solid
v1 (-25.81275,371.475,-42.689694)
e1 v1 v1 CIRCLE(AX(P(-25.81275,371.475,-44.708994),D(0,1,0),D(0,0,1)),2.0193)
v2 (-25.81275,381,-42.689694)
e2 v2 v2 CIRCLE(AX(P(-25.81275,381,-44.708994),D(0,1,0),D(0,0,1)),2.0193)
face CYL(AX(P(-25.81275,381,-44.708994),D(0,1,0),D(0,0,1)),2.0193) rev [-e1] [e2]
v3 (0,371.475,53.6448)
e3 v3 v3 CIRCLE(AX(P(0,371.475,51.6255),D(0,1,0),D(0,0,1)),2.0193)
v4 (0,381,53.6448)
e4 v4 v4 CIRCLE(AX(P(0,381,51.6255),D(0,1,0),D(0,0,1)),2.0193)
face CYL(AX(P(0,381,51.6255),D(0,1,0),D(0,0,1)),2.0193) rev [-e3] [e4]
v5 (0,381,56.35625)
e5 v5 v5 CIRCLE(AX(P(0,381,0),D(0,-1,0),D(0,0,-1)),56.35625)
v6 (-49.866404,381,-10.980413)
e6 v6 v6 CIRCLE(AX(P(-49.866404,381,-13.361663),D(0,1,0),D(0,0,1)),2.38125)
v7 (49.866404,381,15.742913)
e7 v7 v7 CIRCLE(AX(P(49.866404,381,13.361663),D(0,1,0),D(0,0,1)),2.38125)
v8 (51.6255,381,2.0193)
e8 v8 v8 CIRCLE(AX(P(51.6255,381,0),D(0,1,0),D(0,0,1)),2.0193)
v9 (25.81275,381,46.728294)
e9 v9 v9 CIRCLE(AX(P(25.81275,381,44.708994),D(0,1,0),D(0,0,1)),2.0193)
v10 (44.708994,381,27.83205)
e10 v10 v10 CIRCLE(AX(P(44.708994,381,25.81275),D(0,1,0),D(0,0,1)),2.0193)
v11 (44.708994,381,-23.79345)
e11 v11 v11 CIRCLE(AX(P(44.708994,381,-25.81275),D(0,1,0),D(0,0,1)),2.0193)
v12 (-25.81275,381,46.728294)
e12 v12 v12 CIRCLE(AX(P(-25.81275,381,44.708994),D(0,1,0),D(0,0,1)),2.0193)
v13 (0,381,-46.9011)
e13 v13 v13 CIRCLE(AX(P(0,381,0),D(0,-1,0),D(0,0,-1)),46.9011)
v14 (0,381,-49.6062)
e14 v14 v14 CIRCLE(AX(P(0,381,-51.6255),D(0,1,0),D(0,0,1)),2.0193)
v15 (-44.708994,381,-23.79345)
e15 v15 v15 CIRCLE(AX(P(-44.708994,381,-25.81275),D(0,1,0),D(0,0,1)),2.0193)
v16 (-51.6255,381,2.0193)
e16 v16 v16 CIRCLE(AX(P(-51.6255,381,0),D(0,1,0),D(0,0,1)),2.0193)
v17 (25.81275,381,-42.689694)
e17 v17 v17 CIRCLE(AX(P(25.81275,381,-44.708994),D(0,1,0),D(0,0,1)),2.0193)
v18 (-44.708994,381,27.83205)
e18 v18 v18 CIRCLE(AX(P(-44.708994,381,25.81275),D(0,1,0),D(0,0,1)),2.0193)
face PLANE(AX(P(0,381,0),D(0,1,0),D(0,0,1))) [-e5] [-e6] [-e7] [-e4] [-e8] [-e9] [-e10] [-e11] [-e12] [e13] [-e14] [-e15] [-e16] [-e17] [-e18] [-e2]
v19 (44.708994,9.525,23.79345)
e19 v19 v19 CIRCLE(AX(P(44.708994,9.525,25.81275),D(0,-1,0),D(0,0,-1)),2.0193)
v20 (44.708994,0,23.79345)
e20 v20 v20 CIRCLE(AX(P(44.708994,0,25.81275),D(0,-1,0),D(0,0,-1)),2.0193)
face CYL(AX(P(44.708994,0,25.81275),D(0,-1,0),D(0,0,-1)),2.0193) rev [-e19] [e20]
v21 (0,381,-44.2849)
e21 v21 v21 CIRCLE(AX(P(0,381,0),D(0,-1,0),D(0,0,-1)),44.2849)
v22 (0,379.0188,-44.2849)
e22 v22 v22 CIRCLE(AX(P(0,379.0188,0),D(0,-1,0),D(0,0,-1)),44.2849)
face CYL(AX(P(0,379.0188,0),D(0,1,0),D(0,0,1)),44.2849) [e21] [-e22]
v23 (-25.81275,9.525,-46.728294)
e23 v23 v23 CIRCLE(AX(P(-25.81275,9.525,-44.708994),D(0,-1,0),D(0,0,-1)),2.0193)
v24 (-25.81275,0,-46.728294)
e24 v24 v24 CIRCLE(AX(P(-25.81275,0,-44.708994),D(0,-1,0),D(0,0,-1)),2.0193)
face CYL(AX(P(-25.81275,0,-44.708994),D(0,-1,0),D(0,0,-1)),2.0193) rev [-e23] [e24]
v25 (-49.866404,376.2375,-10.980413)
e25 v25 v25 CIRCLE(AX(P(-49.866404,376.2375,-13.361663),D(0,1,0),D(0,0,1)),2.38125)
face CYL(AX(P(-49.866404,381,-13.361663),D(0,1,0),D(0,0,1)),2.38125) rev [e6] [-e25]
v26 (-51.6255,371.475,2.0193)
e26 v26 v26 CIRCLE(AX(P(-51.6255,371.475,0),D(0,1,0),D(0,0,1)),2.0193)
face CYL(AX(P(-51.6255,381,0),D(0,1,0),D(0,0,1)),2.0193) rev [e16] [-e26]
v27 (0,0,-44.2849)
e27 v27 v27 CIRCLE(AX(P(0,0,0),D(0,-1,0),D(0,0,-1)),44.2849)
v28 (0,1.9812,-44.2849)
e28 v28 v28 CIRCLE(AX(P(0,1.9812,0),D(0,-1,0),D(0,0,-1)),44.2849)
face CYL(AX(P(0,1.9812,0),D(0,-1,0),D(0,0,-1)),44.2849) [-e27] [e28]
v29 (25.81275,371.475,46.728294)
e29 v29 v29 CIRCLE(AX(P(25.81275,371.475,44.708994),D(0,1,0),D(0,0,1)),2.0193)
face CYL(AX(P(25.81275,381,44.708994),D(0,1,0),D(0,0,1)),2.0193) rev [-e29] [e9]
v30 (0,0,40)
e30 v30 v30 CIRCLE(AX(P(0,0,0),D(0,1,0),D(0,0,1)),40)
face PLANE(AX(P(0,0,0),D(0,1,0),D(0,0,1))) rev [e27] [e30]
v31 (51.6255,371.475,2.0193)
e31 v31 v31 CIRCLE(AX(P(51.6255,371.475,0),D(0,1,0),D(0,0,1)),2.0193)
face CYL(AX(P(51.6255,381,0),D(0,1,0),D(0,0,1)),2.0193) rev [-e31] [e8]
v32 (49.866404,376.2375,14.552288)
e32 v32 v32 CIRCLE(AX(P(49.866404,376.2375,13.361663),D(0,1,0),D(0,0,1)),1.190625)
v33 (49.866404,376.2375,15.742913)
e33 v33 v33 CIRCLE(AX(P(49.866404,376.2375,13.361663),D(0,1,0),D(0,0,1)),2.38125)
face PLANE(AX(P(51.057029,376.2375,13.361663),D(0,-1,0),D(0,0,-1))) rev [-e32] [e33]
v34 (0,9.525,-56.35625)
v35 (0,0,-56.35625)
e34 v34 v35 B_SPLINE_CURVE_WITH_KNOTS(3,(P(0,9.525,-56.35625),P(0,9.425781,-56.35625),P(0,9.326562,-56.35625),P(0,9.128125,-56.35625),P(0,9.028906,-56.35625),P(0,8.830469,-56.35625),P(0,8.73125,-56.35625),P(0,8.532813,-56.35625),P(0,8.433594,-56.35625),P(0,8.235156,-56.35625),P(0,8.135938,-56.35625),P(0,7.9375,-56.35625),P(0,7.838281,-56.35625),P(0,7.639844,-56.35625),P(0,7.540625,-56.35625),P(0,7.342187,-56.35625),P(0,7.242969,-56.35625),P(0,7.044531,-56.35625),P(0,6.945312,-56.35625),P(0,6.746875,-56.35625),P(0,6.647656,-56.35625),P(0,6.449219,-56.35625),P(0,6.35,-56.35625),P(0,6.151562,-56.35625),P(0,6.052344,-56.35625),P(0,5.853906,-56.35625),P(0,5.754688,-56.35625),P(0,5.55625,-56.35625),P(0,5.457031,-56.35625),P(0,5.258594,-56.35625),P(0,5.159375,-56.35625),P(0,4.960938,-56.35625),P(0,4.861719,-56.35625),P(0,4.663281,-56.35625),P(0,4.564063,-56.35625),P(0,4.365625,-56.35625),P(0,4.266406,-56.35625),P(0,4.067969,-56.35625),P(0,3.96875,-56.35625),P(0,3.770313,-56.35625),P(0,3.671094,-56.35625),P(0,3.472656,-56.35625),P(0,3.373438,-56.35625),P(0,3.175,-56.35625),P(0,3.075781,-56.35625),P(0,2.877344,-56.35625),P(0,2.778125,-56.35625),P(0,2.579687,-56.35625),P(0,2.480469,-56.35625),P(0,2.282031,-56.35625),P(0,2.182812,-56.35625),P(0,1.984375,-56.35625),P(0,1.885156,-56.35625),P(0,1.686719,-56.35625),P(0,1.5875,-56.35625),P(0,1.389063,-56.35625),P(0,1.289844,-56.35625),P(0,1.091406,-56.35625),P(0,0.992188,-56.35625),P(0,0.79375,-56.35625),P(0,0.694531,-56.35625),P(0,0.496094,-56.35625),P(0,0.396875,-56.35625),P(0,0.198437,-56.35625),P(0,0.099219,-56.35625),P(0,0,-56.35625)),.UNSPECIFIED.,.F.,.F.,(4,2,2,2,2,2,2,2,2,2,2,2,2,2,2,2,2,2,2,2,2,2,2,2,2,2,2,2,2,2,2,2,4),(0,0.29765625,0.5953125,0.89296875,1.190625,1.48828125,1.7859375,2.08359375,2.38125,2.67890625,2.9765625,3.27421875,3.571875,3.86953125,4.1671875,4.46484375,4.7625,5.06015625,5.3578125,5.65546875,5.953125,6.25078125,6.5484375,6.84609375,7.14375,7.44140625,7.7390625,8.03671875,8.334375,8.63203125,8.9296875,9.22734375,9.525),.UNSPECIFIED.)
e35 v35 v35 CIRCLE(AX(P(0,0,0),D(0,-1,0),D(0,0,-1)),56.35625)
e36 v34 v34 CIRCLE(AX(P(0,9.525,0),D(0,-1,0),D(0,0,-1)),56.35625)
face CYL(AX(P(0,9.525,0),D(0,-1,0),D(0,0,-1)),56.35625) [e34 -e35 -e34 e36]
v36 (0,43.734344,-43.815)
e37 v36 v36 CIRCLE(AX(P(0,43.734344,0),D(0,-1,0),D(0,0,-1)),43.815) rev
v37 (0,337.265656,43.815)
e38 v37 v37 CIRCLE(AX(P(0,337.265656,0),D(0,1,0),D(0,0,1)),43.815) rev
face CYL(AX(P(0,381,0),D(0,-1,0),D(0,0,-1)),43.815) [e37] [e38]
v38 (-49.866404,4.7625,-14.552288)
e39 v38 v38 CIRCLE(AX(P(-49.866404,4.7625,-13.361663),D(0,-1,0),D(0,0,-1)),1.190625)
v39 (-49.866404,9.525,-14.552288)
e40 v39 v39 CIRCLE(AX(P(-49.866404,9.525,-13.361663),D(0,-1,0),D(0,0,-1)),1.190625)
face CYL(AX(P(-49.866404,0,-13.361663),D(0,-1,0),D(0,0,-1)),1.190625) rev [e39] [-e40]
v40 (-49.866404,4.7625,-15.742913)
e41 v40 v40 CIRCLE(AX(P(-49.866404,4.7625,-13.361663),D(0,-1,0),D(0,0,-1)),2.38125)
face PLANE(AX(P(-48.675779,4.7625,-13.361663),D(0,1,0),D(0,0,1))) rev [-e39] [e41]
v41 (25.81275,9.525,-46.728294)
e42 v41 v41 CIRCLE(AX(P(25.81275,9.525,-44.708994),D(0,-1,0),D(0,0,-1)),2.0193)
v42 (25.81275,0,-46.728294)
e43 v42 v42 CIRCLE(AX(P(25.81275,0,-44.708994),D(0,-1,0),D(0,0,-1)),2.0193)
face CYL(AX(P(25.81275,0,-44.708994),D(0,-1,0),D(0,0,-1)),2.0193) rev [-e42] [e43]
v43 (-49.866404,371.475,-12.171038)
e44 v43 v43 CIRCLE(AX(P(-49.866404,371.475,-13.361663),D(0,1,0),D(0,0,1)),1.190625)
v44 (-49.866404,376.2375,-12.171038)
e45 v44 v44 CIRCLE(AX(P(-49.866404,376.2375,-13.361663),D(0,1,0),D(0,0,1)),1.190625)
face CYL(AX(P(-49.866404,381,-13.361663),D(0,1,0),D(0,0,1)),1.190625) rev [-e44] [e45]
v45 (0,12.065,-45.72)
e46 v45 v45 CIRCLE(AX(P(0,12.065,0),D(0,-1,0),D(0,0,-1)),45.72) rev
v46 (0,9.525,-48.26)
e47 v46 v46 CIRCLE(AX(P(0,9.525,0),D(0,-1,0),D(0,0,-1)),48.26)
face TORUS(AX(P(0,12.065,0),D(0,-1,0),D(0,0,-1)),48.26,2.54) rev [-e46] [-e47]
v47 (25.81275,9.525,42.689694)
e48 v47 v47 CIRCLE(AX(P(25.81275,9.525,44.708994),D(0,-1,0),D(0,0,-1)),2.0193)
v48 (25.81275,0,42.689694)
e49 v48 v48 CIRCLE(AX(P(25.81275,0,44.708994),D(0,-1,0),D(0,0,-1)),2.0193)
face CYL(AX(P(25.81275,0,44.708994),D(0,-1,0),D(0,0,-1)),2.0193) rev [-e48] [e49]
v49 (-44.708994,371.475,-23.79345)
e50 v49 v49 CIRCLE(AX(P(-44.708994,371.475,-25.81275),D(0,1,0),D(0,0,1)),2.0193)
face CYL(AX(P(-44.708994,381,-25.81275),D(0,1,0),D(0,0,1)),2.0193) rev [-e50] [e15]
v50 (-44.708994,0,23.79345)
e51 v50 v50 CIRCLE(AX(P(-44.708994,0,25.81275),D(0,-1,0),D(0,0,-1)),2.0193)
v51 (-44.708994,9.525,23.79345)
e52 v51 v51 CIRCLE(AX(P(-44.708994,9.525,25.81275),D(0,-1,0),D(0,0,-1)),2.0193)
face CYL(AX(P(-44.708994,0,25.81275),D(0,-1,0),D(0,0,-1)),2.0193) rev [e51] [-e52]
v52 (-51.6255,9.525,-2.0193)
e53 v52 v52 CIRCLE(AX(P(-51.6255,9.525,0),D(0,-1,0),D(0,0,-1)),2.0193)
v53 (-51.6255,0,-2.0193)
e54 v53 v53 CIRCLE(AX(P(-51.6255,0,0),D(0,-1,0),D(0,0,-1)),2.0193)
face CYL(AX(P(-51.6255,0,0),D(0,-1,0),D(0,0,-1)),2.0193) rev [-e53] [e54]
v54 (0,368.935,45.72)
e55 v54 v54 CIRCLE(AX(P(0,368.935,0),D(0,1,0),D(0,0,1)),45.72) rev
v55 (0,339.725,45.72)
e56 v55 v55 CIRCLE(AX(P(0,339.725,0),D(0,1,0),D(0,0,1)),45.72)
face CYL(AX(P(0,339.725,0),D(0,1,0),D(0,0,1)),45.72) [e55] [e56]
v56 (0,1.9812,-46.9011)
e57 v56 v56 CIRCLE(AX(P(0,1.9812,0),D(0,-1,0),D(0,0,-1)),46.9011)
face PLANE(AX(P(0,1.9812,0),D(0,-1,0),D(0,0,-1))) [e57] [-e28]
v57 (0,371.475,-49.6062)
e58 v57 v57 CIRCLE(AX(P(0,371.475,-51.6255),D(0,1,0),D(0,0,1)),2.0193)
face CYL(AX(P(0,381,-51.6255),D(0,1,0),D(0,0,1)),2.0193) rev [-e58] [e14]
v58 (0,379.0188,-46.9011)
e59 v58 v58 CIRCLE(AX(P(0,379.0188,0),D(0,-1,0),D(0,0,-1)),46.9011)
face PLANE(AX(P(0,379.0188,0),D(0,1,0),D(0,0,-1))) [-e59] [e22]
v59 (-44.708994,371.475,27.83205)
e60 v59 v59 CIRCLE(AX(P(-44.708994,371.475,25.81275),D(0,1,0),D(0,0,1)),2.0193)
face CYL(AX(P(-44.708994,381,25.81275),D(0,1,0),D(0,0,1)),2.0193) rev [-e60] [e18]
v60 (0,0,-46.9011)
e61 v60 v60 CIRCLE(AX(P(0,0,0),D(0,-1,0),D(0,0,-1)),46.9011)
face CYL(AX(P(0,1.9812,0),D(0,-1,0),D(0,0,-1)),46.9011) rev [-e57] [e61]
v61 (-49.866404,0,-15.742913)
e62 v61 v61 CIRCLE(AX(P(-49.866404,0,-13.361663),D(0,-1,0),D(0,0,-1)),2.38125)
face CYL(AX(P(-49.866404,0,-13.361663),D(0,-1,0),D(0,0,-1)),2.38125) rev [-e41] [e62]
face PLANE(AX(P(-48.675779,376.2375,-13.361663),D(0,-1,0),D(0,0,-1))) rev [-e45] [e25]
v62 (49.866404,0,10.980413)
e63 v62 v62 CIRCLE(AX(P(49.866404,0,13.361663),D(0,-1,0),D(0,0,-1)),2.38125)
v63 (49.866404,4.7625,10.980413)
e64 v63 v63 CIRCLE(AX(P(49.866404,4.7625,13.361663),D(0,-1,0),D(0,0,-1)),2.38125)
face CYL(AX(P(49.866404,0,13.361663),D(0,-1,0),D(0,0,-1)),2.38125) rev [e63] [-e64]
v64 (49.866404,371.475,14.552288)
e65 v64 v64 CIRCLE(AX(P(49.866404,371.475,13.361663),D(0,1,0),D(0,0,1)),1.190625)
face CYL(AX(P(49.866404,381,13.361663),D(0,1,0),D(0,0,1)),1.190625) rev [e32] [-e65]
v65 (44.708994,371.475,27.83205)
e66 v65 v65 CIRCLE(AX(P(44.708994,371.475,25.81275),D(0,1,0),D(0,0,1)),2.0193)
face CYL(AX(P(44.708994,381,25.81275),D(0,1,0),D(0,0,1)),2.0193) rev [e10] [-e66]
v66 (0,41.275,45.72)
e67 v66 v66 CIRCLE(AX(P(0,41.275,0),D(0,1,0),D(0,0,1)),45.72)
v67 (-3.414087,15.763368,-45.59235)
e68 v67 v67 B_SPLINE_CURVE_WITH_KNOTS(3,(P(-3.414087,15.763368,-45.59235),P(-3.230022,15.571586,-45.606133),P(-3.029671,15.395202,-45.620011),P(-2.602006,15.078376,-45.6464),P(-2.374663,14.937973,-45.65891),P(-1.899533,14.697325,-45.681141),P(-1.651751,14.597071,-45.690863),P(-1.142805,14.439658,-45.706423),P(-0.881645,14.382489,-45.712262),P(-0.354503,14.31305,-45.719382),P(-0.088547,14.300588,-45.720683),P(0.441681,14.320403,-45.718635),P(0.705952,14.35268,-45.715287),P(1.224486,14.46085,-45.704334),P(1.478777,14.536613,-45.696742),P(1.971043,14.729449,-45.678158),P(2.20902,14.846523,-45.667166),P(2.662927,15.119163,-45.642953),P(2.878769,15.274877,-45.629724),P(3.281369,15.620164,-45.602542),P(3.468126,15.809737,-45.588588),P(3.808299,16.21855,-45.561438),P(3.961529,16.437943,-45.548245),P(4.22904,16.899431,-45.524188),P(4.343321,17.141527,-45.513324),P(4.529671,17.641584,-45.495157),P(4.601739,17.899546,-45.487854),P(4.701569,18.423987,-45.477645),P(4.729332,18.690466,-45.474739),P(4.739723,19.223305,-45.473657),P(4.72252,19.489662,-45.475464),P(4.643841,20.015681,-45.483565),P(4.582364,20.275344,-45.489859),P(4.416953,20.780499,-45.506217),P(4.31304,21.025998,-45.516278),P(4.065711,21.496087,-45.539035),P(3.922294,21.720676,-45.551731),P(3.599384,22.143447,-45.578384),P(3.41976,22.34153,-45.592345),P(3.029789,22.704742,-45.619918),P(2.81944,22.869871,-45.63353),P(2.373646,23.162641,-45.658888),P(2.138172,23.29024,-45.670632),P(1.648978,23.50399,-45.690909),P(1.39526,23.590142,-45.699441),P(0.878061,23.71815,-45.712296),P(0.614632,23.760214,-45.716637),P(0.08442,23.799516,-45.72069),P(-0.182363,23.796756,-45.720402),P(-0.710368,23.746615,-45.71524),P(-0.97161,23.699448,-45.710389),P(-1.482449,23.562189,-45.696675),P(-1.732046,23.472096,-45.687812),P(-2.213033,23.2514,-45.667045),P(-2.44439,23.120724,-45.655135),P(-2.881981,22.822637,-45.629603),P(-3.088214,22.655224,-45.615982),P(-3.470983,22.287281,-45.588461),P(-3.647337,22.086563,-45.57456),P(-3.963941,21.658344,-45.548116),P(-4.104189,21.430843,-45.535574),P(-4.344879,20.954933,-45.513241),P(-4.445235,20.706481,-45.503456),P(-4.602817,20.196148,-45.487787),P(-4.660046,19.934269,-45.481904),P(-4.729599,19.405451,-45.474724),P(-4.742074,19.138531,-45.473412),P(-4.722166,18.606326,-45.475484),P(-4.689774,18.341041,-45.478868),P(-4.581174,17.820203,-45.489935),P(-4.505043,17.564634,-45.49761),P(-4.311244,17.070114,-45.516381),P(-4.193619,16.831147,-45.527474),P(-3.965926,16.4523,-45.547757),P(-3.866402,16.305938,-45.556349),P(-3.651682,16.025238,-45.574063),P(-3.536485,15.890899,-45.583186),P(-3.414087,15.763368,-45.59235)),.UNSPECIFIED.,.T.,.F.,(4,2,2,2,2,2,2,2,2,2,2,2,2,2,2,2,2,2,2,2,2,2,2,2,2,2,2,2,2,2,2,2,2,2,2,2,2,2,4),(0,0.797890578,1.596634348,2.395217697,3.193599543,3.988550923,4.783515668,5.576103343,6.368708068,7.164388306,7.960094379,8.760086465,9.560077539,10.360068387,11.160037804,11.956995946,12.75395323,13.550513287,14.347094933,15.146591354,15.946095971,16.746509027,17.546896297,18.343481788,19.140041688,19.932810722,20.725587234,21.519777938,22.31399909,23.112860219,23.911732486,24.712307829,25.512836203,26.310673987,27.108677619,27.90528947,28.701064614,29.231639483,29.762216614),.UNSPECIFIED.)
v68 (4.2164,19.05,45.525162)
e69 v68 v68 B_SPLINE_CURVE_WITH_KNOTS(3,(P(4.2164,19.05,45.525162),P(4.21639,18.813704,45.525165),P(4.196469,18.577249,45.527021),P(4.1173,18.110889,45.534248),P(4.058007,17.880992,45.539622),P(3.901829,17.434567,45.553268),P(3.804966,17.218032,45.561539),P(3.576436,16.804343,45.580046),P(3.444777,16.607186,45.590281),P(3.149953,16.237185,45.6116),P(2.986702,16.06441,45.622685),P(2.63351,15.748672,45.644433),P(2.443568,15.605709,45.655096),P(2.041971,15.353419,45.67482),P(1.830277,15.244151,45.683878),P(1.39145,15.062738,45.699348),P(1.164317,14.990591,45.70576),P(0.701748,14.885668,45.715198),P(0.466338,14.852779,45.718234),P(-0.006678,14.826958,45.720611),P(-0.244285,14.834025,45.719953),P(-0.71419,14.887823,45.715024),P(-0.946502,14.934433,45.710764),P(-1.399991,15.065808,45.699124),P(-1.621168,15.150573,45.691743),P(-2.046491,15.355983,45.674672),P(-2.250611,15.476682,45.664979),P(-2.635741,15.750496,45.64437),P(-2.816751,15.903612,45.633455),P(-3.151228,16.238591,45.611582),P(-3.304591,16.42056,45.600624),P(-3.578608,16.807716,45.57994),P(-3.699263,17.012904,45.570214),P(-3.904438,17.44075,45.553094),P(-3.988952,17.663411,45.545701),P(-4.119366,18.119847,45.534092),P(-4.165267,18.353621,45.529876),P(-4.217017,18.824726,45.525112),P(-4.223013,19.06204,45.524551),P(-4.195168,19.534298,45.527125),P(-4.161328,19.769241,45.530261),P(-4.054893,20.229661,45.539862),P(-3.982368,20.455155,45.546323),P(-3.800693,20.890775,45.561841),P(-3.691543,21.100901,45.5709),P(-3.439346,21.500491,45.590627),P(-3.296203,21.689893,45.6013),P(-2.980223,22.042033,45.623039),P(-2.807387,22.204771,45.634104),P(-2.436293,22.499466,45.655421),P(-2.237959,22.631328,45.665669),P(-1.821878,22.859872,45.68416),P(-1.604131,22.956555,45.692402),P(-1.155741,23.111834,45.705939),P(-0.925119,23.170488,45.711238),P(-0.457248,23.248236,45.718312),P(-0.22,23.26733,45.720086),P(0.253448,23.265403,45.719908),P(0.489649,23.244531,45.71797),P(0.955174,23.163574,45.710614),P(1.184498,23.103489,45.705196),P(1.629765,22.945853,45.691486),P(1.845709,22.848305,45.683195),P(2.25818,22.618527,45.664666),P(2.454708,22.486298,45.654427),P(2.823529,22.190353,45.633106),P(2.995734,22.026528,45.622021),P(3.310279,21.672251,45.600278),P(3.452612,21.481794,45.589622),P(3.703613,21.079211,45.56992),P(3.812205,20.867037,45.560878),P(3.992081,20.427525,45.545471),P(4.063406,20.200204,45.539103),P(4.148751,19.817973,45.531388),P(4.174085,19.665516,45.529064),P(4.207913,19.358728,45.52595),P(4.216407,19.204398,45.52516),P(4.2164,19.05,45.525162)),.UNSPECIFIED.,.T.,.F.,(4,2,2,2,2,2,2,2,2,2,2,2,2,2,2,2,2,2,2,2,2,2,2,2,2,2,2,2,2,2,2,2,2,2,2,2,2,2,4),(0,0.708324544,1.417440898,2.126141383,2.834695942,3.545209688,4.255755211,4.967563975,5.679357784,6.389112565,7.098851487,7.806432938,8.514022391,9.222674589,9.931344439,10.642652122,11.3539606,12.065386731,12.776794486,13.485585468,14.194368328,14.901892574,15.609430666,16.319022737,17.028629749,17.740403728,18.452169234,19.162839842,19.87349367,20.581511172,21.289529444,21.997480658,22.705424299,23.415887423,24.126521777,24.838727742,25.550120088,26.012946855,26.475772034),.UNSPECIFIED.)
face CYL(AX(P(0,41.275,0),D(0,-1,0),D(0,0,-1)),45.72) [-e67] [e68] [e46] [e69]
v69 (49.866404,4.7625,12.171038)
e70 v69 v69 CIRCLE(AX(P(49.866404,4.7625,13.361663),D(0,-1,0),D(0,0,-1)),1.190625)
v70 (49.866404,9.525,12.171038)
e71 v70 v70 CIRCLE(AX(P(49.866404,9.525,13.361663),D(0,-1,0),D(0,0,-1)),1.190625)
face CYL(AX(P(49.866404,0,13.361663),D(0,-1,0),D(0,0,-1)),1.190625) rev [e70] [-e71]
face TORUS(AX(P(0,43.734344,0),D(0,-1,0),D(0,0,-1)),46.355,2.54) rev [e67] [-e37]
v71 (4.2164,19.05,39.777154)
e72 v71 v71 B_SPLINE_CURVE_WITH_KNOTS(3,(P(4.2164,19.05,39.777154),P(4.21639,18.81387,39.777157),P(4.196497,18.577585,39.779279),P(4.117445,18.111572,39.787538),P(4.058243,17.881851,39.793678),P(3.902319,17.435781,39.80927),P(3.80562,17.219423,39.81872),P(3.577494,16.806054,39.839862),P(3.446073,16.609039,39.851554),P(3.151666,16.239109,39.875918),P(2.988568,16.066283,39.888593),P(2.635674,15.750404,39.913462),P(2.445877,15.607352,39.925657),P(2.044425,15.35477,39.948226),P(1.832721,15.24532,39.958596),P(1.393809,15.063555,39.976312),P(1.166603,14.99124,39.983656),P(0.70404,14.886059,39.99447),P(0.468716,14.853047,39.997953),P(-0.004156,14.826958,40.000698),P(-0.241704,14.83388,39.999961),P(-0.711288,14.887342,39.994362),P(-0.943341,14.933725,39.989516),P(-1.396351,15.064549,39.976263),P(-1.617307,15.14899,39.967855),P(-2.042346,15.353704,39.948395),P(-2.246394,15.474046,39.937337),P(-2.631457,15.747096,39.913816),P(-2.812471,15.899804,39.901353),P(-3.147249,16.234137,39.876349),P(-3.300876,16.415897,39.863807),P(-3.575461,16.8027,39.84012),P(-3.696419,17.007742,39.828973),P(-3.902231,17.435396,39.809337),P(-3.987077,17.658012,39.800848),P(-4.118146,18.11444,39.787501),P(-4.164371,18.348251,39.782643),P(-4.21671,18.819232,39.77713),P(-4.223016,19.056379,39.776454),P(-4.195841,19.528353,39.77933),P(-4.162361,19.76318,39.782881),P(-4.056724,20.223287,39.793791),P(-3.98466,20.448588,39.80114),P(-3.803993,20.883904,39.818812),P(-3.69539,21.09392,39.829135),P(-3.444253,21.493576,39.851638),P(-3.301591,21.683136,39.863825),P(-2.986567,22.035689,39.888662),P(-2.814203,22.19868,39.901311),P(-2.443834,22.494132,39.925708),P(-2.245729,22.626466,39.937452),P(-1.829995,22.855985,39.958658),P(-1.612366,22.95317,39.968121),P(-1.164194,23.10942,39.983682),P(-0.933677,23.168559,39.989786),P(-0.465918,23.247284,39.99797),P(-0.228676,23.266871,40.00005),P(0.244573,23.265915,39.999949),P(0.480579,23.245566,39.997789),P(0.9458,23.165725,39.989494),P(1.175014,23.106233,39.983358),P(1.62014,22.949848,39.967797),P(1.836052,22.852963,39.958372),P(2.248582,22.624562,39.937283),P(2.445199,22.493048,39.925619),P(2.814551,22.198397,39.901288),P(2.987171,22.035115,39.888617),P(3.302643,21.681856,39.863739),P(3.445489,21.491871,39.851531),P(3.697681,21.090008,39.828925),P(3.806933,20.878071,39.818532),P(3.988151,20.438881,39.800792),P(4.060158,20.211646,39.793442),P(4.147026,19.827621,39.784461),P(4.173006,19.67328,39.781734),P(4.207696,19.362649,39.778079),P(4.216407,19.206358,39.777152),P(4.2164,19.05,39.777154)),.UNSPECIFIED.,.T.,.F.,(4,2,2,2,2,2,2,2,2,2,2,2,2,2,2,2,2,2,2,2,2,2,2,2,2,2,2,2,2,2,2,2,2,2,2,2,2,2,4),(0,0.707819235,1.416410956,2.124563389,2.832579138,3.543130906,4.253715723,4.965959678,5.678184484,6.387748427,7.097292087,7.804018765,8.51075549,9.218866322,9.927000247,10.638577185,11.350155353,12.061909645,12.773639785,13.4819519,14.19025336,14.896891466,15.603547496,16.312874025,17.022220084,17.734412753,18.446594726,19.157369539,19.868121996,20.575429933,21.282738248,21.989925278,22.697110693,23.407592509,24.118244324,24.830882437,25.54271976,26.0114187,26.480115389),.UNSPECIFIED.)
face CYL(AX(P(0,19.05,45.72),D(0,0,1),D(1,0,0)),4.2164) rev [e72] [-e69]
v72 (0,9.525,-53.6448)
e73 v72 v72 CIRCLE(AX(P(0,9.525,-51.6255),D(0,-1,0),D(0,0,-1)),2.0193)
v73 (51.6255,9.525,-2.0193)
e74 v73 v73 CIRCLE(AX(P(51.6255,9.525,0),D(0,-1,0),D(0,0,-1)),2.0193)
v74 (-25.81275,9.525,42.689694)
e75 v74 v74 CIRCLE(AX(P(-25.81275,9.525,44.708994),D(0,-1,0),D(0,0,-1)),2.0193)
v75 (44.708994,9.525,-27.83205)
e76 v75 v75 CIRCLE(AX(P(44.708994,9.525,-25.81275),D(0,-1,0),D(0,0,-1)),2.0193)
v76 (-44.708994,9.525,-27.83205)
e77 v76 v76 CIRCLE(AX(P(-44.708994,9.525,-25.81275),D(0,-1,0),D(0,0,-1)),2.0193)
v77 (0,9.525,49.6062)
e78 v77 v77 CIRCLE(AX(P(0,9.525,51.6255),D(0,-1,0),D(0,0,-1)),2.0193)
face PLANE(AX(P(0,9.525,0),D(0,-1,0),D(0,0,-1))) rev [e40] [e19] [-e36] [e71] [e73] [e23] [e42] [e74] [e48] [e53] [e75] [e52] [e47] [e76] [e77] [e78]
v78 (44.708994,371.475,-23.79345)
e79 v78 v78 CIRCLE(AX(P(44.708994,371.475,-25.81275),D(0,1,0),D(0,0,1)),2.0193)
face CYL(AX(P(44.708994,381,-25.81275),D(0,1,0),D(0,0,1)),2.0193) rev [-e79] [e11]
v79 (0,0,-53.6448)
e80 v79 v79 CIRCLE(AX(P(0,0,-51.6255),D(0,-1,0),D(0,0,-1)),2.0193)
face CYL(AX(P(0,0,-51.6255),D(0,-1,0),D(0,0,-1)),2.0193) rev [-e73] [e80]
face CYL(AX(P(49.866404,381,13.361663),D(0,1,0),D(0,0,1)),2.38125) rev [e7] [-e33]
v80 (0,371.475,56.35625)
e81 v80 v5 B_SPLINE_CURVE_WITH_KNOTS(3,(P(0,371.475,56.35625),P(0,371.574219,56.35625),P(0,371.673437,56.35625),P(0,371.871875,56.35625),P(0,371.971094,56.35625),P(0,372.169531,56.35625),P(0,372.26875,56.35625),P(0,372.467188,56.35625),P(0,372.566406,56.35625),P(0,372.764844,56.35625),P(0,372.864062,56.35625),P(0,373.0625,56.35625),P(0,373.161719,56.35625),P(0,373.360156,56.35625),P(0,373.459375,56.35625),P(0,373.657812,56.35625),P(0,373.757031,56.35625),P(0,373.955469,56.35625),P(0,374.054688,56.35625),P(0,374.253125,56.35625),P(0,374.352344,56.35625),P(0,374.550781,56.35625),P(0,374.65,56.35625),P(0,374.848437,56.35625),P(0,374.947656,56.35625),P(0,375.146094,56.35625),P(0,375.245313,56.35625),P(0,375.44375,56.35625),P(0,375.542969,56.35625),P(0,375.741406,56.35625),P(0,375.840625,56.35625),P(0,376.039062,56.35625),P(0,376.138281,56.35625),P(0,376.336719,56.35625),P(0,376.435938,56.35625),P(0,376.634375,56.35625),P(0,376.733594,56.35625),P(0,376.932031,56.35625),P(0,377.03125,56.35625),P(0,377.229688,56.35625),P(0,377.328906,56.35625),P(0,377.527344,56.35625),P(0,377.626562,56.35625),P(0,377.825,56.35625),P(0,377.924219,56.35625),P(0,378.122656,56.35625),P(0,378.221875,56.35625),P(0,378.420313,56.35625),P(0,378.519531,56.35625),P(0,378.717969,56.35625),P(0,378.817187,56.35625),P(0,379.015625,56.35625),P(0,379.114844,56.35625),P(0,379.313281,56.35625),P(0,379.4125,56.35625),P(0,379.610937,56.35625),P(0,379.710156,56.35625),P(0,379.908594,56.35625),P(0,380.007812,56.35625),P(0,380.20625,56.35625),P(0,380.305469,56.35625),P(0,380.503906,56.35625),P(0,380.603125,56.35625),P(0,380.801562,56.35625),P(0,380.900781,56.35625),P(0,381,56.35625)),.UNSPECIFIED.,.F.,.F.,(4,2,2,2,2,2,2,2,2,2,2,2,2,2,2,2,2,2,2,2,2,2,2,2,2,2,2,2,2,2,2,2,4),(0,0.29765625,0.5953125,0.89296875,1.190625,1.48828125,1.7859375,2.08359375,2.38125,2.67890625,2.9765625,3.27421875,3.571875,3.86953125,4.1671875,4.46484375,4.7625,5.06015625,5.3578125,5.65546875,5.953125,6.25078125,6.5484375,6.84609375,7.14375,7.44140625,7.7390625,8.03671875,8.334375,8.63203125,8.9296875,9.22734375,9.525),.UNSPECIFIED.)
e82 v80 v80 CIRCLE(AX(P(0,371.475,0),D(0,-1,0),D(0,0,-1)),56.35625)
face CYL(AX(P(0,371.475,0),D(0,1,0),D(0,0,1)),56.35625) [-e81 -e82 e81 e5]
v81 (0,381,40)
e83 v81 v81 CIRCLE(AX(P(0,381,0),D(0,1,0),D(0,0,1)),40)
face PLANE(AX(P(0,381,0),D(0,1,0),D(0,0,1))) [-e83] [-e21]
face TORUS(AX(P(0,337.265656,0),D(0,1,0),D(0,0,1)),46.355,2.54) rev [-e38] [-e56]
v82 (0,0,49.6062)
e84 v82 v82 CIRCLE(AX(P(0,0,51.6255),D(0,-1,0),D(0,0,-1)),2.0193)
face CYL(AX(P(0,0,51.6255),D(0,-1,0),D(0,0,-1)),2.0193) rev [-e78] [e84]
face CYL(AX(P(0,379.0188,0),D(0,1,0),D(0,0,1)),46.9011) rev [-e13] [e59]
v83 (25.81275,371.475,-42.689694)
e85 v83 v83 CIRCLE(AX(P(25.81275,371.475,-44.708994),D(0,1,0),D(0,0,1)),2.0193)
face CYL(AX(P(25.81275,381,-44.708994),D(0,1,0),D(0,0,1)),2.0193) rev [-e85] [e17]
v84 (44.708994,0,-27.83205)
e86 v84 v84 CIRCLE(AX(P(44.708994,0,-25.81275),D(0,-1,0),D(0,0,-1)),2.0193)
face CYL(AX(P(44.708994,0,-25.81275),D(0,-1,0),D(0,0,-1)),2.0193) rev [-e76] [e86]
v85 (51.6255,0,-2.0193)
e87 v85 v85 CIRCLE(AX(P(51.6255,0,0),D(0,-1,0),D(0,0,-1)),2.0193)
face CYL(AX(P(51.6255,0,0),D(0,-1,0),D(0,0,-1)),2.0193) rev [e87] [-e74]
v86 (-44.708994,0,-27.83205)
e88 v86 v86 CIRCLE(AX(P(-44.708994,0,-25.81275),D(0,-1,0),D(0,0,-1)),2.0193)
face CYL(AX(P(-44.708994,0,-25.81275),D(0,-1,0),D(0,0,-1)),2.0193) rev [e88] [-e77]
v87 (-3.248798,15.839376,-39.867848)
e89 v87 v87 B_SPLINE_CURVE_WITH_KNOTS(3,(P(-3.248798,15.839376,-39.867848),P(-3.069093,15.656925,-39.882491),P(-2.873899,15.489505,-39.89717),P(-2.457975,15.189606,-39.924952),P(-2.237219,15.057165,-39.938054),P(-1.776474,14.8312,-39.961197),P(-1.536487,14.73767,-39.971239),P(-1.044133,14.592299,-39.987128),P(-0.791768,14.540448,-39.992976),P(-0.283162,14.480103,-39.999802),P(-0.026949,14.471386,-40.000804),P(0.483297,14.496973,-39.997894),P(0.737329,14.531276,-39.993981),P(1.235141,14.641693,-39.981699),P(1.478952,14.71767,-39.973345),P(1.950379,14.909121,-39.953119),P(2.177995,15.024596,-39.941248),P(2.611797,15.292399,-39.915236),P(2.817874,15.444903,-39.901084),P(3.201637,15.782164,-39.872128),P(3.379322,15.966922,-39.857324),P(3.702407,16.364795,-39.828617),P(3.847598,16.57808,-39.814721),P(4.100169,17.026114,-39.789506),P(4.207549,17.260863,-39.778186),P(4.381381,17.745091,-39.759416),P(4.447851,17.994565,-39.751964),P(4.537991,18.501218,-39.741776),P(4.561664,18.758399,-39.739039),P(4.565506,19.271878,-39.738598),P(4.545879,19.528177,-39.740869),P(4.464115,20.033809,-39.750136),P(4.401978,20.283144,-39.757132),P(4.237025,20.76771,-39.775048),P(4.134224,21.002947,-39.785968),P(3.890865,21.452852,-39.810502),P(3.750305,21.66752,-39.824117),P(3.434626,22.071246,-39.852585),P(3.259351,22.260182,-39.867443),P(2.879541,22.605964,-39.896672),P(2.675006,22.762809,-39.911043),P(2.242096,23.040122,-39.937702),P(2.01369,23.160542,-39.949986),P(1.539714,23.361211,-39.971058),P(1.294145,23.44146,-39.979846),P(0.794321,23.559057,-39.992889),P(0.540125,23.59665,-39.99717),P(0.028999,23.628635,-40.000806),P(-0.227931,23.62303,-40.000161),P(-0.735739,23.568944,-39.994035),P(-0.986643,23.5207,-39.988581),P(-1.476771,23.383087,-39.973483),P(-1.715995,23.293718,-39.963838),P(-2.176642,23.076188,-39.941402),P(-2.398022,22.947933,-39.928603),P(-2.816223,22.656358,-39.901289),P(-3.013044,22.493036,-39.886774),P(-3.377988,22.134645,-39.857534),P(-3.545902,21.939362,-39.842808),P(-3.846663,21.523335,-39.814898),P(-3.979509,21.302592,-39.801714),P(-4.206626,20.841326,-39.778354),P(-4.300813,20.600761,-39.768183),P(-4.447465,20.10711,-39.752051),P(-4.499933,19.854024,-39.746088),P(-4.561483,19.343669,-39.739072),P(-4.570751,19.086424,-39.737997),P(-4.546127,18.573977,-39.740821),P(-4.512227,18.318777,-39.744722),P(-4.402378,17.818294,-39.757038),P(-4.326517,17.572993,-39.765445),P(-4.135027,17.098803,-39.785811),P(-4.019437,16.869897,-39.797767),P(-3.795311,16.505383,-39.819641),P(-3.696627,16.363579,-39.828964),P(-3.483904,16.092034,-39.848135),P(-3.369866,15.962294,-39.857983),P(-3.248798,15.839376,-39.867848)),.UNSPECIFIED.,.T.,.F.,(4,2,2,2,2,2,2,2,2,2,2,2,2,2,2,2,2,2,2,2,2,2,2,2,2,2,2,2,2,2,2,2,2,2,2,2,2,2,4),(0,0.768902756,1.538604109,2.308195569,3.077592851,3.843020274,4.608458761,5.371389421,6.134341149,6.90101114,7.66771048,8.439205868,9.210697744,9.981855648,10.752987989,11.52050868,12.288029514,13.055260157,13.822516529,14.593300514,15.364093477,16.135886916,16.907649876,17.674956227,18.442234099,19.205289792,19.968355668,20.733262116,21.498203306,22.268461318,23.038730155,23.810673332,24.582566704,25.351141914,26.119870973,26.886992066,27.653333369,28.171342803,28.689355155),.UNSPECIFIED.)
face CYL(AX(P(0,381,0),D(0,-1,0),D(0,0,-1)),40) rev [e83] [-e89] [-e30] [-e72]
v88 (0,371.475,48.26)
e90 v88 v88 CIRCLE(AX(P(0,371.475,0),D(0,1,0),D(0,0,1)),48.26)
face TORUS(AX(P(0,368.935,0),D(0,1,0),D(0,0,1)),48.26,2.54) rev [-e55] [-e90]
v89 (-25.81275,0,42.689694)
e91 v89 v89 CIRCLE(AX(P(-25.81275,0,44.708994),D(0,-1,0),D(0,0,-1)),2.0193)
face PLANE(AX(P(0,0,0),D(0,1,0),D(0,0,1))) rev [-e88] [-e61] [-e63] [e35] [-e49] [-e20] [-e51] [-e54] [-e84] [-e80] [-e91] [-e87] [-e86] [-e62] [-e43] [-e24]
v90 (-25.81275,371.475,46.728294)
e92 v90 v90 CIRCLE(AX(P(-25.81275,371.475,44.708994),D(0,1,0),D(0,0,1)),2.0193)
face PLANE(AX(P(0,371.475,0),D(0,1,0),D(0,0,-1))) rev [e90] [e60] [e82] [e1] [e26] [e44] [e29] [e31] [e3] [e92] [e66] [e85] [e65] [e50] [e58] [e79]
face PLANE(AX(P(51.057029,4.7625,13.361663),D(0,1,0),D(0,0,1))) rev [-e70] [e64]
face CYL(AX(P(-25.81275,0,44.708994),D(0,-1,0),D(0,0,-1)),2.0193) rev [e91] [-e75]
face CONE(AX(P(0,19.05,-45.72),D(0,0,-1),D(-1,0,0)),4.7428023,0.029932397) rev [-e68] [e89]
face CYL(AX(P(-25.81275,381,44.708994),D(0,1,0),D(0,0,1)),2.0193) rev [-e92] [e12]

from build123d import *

# Parameters (mm, degrees)
SKETCH2_R               = 43.815
SKETCH2_R_2             = 40
BASE_CYLINDER_DEPTH     = 381
SKETCH3_R               = 56.35625
SKETCH3_R_2             = 40
AFT_FLANGE_DEPTH        = 9.525
SKETCH6_R               = 46.9011
SKETCH6_R_2             = 44.2849
AFT_O_RING_DEPTH        = 1.9812
SKETCH33_R              = 45.72
SKETCH33_R_2            = 43.815
CRITICALBOSS_DEPTH      = 31.75
FILLET1_R               = 2.54
BOLT_CIRCLE_D           = 4.0386
HOLE1_D                 = 2.38125
HOLE1_CBORE_D           = 4.7625
HOLE1_CBORE_DEPTH       = 4.7625
F_3_8_24_TAPPED_HOLE1_D = 8.4328
FILLET1_OF_MIRROR1_R    = 2.54


with BuildPart() as part:
    # Sketch2 → Base Cylinder (new body)
    with BuildSketch(Plane(origin=(0, 0, 0), x_dir=(1, 0, 0), z_dir=(0, 1, 0))):
        with Locations(Location((0, 0, 0), (0, 0, 270))):
            Circle(SKETCH2_R)
        with Locations(Location((0, 0, 0), (0, 0, 270))):
            Circle(SKETCH2_R_2, mode=Mode.SUBTRACT)
    extrude(amount=BASE_CYLINDER_DEPTH)

    # Sketch3 → Aft Flange (add)
    with BuildSketch(Plane.XZ):
        with Locations(Location((0, 0, 0), (0, 0, 270))):
            Circle(SKETCH3_R)
        with Locations(Location((0, 0, 0), (0, 0, 90))):
            Circle(SKETCH3_R_2, mode=Mode.SUBTRACT)
    aft_flange = extrude(amount=-AFT_FLANGE_DEPTH)

    # Sketch6 → Aft O-Ring (cut)
    with BuildSketch(Plane.XZ):
        with Locations(Location((0, 0, 0), (0, 0, 270))):
            Circle(SKETCH6_R)
        with Locations(Location((0, 0, 0), (0, 0, 270))):
            Circle(SKETCH6_R_2, mode=Mode.SUBTRACT)
    aft_o_ring = extrude(amount=-AFT_O_RING_DEPTH, mode=Mode.SUBTRACT)

    # Sketch33 → CriticalBoss (add)
    with BuildSketch(Plane(origin=(0, 9.525, 0), x_dir=(1, 0, 0), z_dir=(0, 1, 0))):
        with Locations(Location((0, 0, 0), (0, 0, 90))):
            Circle(SKETCH33_R)
        with Locations(Location((0, 0, 0), (0, 0, 270))):
            Circle(SKETCH33_R_2, mode=Mode.SUBTRACT)
    criticalboss = extrude(amount=CRITICALBOSS_DEPTH)

    # Fillet1
    # the kernel refuses this fillet: 2.54 mm, written as the material it adds along each edge
    with BuildSketch(Plane(origin=(0, 9.525, 0), x_dir=(0, 0, -1), z_dir=(1, 0, 0))) as fillet1_piece_1:
        with BuildLine():
            CenterArc((45.72 + FILLET1_R, FILLET1_R), FILLET1_R, 180, 90)
            Line((45.72, FILLET1_R), (45.72 - FILLET1_R * 0.02, FILLET1_R))
            Line((45.72 - FILLET1_R * 0.02, FILLET1_R), (45.72 - FILLET1_R * 0.02, -FILLET1_R * 0.02))
            Line((45.72 - FILLET1_R * 0.02, -FILLET1_R * 0.02), (45.72 + FILLET1_R, -FILLET1_R * 0.02))
            Line((45.72 + FILLET1_R, -FILLET1_R * 0.02), (45.72 + FILLET1_R, 0))
        make_face()
    revolve(axis=Axis((0, 9.525, 0), (0, 1, 0)))
    with BuildSketch(Plane(origin=(0, 41.275, 0), x_dir=(0, 0, 1), z_dir=(-1, 0, 0))) as fillet1_piece_2:
        with BuildLine():
            CenterArc((46.355, 2.459344425), FILLET1_R, 180, 75.522487814)
            Line((43.815, 2.459344425), (43.7642, 2.459344425))
            Line((43.7642, 2.459344425), (43.7642, 0))
            Line((43.7642, 0), (43.815, -0.0508))
            ThreePointArc((43.815, -0.0508), (44.7675, -0.0508), (45.7073, -0.049186888))
            Line((45.7073, -0.049186888), (45.72, 0))
        make_face()
    revolve(axis=Axis((0, 41.275, 0), (0, 1, 0)))

    # Bolt Circle (through all)
    with Locations(Plane(origin=(0, 0, 0), x_dir=(-1, 0, 0), z_dir=(0, -1, 0))):
        with Locations((-25.81275, -44.708994483), (-44.708994483, -25.81275), (-51.6255, 0), (-44.708994483, 25.81275), (-25.81275, 44.708994483), (0, 51.6255), (25.81275, 44.708994483), (44.708994483, 25.81275), (51.6255, 0), (44.708994483, -25.81275), (25.81275, -44.708994483), (0, -51.6255)):
            bolt_circle = Hole(BOLT_CIRCLE_D / 2)

    # Hole1 (through all)
    with Locations(Plane(origin=(0, 0, 0), x_dir=(-1, 0, 0), z_dir=(0, -1, 0))):
        with Locations((49.866403745, 13.361662613), (-49.866403745, -13.361662613)):
            hole1 = CounterBoreHole(HOLE1_D / 2, HOLE1_CBORE_D / 2, HOLE1_CBORE_DEPTH)

    # Sketch44 → 1/8 NPT Tapped ThermocoupleHole (revolve, cut)
    with BuildSketch(Plane(origin=(0, 19.05, -45.72), x_dir=(0, 1, 0), z_dir=(1, 0, 0))):
        Polygon((0, 0), (0, 14.213468714), (4.2164, 11.68), (4.2164, 6.86), (4.537404713, 6.86), (4.7428023, 0), align=None)
    revolve(axis=Axis((0, 19.05, -52.07), (0, 0, 1)), mode=Mode.SUBTRACT)

    # 3/8-24 Tapped Hole1 (through all)
    with Locations(Plane.XY.offset(45.72)):
        with Locations((0, 19.05)):
            Hole(F_3_8_24_TAPPED_HOLE1_D / 2)

    # Mirror1: Aft Flange, Aft O-Ring, CriticalBoss, Bolt Circle, Hole1 across plane
    add(aft_flange.mirror(Plane.ZX.offset(190.5)))
    add(aft_o_ring.mirror(Plane.ZX.offset(190.5)), mode=Mode.SUBTRACT)
    add(criticalboss.mirror(Plane.ZX.offset(190.5)))
    add(bolt_circle.mirror(Plane.ZX.offset(190.5)), mode=Mode.SUBTRACT)
    add(hole1.mirror(Plane.ZX.offset(190.5)), mode=Mode.SUBTRACT)

    # Fillet1 of Mirror1
    # the kernel refuses this fillet: 2.54 mm, written as the material it adds along each edge
    with BuildSketch(Plane(origin=(0, 371.475, 0), x_dir=(0, 0, -1), z_dir=(1, 0, 0))) as fillet1_of_mirror1_piece_1:
        with BuildLine():
            CenterArc((45.72 + FILLET1_OF_MIRROR1_R, -FILLET1_OF_MIRROR1_R), FILLET1_OF_MIRROR1_R, 90, 90)
            Line((45.72 + FILLET1_OF_MIRROR1_R, 0), (45.72 + FILLET1_OF_MIRROR1_R, FILLET1_OF_MIRROR1_R * 0.02))
            Line((45.72 + FILLET1_OF_MIRROR1_R, FILLET1_OF_MIRROR1_R * 0.02), (45.72 - FILLET1_OF_MIRROR1_R * 0.02, FILLET1_OF_MIRROR1_R * 0.02))
            Line((45.72 - FILLET1_OF_MIRROR1_R * 0.02, FILLET1_OF_MIRROR1_R * 0.02), (45.72 - FILLET1_OF_MIRROR1_R * 0.02, -FILLET1_OF_MIRROR1_R))
            Line((45.72 - FILLET1_OF_MIRROR1_R * 0.02, -FILLET1_OF_MIRROR1_R), (45.72, -FILLET1_OF_MIRROR1_R))
        make_face()
    revolve(axis=Axis((0, 371.475, 0), (0, 1, 0)))
    with BuildSketch(Plane(origin=(0, 339.725, 0), x_dir=(0, 0, 1), z_dir=(-1, 0, 0))) as fillet1_of_mirror1_piece_2:
        with BuildLine():
            CenterArc((46.355, -2.459344425), FILLET1_OF_MIRROR1_R, 104.477512186, 75.522487814)
            Line((45.72, 0), (45.7073, 0.049186888))
            ThreePointArc((45.7073, 0.049186888), (44.7675, 0.0508), (43.815, 0.0508))
            Line((43.815, 0.0508), (43.7642, 0))
            Line((43.7642, 0), (43.7642, -2.459344425))
            Line((43.7642, -2.459344425), (43.815, -2.459344425))
        make_face()
    revolve(axis=Axis((0, 339.725, 0), (0, 1, 0)))


solid = part.part
